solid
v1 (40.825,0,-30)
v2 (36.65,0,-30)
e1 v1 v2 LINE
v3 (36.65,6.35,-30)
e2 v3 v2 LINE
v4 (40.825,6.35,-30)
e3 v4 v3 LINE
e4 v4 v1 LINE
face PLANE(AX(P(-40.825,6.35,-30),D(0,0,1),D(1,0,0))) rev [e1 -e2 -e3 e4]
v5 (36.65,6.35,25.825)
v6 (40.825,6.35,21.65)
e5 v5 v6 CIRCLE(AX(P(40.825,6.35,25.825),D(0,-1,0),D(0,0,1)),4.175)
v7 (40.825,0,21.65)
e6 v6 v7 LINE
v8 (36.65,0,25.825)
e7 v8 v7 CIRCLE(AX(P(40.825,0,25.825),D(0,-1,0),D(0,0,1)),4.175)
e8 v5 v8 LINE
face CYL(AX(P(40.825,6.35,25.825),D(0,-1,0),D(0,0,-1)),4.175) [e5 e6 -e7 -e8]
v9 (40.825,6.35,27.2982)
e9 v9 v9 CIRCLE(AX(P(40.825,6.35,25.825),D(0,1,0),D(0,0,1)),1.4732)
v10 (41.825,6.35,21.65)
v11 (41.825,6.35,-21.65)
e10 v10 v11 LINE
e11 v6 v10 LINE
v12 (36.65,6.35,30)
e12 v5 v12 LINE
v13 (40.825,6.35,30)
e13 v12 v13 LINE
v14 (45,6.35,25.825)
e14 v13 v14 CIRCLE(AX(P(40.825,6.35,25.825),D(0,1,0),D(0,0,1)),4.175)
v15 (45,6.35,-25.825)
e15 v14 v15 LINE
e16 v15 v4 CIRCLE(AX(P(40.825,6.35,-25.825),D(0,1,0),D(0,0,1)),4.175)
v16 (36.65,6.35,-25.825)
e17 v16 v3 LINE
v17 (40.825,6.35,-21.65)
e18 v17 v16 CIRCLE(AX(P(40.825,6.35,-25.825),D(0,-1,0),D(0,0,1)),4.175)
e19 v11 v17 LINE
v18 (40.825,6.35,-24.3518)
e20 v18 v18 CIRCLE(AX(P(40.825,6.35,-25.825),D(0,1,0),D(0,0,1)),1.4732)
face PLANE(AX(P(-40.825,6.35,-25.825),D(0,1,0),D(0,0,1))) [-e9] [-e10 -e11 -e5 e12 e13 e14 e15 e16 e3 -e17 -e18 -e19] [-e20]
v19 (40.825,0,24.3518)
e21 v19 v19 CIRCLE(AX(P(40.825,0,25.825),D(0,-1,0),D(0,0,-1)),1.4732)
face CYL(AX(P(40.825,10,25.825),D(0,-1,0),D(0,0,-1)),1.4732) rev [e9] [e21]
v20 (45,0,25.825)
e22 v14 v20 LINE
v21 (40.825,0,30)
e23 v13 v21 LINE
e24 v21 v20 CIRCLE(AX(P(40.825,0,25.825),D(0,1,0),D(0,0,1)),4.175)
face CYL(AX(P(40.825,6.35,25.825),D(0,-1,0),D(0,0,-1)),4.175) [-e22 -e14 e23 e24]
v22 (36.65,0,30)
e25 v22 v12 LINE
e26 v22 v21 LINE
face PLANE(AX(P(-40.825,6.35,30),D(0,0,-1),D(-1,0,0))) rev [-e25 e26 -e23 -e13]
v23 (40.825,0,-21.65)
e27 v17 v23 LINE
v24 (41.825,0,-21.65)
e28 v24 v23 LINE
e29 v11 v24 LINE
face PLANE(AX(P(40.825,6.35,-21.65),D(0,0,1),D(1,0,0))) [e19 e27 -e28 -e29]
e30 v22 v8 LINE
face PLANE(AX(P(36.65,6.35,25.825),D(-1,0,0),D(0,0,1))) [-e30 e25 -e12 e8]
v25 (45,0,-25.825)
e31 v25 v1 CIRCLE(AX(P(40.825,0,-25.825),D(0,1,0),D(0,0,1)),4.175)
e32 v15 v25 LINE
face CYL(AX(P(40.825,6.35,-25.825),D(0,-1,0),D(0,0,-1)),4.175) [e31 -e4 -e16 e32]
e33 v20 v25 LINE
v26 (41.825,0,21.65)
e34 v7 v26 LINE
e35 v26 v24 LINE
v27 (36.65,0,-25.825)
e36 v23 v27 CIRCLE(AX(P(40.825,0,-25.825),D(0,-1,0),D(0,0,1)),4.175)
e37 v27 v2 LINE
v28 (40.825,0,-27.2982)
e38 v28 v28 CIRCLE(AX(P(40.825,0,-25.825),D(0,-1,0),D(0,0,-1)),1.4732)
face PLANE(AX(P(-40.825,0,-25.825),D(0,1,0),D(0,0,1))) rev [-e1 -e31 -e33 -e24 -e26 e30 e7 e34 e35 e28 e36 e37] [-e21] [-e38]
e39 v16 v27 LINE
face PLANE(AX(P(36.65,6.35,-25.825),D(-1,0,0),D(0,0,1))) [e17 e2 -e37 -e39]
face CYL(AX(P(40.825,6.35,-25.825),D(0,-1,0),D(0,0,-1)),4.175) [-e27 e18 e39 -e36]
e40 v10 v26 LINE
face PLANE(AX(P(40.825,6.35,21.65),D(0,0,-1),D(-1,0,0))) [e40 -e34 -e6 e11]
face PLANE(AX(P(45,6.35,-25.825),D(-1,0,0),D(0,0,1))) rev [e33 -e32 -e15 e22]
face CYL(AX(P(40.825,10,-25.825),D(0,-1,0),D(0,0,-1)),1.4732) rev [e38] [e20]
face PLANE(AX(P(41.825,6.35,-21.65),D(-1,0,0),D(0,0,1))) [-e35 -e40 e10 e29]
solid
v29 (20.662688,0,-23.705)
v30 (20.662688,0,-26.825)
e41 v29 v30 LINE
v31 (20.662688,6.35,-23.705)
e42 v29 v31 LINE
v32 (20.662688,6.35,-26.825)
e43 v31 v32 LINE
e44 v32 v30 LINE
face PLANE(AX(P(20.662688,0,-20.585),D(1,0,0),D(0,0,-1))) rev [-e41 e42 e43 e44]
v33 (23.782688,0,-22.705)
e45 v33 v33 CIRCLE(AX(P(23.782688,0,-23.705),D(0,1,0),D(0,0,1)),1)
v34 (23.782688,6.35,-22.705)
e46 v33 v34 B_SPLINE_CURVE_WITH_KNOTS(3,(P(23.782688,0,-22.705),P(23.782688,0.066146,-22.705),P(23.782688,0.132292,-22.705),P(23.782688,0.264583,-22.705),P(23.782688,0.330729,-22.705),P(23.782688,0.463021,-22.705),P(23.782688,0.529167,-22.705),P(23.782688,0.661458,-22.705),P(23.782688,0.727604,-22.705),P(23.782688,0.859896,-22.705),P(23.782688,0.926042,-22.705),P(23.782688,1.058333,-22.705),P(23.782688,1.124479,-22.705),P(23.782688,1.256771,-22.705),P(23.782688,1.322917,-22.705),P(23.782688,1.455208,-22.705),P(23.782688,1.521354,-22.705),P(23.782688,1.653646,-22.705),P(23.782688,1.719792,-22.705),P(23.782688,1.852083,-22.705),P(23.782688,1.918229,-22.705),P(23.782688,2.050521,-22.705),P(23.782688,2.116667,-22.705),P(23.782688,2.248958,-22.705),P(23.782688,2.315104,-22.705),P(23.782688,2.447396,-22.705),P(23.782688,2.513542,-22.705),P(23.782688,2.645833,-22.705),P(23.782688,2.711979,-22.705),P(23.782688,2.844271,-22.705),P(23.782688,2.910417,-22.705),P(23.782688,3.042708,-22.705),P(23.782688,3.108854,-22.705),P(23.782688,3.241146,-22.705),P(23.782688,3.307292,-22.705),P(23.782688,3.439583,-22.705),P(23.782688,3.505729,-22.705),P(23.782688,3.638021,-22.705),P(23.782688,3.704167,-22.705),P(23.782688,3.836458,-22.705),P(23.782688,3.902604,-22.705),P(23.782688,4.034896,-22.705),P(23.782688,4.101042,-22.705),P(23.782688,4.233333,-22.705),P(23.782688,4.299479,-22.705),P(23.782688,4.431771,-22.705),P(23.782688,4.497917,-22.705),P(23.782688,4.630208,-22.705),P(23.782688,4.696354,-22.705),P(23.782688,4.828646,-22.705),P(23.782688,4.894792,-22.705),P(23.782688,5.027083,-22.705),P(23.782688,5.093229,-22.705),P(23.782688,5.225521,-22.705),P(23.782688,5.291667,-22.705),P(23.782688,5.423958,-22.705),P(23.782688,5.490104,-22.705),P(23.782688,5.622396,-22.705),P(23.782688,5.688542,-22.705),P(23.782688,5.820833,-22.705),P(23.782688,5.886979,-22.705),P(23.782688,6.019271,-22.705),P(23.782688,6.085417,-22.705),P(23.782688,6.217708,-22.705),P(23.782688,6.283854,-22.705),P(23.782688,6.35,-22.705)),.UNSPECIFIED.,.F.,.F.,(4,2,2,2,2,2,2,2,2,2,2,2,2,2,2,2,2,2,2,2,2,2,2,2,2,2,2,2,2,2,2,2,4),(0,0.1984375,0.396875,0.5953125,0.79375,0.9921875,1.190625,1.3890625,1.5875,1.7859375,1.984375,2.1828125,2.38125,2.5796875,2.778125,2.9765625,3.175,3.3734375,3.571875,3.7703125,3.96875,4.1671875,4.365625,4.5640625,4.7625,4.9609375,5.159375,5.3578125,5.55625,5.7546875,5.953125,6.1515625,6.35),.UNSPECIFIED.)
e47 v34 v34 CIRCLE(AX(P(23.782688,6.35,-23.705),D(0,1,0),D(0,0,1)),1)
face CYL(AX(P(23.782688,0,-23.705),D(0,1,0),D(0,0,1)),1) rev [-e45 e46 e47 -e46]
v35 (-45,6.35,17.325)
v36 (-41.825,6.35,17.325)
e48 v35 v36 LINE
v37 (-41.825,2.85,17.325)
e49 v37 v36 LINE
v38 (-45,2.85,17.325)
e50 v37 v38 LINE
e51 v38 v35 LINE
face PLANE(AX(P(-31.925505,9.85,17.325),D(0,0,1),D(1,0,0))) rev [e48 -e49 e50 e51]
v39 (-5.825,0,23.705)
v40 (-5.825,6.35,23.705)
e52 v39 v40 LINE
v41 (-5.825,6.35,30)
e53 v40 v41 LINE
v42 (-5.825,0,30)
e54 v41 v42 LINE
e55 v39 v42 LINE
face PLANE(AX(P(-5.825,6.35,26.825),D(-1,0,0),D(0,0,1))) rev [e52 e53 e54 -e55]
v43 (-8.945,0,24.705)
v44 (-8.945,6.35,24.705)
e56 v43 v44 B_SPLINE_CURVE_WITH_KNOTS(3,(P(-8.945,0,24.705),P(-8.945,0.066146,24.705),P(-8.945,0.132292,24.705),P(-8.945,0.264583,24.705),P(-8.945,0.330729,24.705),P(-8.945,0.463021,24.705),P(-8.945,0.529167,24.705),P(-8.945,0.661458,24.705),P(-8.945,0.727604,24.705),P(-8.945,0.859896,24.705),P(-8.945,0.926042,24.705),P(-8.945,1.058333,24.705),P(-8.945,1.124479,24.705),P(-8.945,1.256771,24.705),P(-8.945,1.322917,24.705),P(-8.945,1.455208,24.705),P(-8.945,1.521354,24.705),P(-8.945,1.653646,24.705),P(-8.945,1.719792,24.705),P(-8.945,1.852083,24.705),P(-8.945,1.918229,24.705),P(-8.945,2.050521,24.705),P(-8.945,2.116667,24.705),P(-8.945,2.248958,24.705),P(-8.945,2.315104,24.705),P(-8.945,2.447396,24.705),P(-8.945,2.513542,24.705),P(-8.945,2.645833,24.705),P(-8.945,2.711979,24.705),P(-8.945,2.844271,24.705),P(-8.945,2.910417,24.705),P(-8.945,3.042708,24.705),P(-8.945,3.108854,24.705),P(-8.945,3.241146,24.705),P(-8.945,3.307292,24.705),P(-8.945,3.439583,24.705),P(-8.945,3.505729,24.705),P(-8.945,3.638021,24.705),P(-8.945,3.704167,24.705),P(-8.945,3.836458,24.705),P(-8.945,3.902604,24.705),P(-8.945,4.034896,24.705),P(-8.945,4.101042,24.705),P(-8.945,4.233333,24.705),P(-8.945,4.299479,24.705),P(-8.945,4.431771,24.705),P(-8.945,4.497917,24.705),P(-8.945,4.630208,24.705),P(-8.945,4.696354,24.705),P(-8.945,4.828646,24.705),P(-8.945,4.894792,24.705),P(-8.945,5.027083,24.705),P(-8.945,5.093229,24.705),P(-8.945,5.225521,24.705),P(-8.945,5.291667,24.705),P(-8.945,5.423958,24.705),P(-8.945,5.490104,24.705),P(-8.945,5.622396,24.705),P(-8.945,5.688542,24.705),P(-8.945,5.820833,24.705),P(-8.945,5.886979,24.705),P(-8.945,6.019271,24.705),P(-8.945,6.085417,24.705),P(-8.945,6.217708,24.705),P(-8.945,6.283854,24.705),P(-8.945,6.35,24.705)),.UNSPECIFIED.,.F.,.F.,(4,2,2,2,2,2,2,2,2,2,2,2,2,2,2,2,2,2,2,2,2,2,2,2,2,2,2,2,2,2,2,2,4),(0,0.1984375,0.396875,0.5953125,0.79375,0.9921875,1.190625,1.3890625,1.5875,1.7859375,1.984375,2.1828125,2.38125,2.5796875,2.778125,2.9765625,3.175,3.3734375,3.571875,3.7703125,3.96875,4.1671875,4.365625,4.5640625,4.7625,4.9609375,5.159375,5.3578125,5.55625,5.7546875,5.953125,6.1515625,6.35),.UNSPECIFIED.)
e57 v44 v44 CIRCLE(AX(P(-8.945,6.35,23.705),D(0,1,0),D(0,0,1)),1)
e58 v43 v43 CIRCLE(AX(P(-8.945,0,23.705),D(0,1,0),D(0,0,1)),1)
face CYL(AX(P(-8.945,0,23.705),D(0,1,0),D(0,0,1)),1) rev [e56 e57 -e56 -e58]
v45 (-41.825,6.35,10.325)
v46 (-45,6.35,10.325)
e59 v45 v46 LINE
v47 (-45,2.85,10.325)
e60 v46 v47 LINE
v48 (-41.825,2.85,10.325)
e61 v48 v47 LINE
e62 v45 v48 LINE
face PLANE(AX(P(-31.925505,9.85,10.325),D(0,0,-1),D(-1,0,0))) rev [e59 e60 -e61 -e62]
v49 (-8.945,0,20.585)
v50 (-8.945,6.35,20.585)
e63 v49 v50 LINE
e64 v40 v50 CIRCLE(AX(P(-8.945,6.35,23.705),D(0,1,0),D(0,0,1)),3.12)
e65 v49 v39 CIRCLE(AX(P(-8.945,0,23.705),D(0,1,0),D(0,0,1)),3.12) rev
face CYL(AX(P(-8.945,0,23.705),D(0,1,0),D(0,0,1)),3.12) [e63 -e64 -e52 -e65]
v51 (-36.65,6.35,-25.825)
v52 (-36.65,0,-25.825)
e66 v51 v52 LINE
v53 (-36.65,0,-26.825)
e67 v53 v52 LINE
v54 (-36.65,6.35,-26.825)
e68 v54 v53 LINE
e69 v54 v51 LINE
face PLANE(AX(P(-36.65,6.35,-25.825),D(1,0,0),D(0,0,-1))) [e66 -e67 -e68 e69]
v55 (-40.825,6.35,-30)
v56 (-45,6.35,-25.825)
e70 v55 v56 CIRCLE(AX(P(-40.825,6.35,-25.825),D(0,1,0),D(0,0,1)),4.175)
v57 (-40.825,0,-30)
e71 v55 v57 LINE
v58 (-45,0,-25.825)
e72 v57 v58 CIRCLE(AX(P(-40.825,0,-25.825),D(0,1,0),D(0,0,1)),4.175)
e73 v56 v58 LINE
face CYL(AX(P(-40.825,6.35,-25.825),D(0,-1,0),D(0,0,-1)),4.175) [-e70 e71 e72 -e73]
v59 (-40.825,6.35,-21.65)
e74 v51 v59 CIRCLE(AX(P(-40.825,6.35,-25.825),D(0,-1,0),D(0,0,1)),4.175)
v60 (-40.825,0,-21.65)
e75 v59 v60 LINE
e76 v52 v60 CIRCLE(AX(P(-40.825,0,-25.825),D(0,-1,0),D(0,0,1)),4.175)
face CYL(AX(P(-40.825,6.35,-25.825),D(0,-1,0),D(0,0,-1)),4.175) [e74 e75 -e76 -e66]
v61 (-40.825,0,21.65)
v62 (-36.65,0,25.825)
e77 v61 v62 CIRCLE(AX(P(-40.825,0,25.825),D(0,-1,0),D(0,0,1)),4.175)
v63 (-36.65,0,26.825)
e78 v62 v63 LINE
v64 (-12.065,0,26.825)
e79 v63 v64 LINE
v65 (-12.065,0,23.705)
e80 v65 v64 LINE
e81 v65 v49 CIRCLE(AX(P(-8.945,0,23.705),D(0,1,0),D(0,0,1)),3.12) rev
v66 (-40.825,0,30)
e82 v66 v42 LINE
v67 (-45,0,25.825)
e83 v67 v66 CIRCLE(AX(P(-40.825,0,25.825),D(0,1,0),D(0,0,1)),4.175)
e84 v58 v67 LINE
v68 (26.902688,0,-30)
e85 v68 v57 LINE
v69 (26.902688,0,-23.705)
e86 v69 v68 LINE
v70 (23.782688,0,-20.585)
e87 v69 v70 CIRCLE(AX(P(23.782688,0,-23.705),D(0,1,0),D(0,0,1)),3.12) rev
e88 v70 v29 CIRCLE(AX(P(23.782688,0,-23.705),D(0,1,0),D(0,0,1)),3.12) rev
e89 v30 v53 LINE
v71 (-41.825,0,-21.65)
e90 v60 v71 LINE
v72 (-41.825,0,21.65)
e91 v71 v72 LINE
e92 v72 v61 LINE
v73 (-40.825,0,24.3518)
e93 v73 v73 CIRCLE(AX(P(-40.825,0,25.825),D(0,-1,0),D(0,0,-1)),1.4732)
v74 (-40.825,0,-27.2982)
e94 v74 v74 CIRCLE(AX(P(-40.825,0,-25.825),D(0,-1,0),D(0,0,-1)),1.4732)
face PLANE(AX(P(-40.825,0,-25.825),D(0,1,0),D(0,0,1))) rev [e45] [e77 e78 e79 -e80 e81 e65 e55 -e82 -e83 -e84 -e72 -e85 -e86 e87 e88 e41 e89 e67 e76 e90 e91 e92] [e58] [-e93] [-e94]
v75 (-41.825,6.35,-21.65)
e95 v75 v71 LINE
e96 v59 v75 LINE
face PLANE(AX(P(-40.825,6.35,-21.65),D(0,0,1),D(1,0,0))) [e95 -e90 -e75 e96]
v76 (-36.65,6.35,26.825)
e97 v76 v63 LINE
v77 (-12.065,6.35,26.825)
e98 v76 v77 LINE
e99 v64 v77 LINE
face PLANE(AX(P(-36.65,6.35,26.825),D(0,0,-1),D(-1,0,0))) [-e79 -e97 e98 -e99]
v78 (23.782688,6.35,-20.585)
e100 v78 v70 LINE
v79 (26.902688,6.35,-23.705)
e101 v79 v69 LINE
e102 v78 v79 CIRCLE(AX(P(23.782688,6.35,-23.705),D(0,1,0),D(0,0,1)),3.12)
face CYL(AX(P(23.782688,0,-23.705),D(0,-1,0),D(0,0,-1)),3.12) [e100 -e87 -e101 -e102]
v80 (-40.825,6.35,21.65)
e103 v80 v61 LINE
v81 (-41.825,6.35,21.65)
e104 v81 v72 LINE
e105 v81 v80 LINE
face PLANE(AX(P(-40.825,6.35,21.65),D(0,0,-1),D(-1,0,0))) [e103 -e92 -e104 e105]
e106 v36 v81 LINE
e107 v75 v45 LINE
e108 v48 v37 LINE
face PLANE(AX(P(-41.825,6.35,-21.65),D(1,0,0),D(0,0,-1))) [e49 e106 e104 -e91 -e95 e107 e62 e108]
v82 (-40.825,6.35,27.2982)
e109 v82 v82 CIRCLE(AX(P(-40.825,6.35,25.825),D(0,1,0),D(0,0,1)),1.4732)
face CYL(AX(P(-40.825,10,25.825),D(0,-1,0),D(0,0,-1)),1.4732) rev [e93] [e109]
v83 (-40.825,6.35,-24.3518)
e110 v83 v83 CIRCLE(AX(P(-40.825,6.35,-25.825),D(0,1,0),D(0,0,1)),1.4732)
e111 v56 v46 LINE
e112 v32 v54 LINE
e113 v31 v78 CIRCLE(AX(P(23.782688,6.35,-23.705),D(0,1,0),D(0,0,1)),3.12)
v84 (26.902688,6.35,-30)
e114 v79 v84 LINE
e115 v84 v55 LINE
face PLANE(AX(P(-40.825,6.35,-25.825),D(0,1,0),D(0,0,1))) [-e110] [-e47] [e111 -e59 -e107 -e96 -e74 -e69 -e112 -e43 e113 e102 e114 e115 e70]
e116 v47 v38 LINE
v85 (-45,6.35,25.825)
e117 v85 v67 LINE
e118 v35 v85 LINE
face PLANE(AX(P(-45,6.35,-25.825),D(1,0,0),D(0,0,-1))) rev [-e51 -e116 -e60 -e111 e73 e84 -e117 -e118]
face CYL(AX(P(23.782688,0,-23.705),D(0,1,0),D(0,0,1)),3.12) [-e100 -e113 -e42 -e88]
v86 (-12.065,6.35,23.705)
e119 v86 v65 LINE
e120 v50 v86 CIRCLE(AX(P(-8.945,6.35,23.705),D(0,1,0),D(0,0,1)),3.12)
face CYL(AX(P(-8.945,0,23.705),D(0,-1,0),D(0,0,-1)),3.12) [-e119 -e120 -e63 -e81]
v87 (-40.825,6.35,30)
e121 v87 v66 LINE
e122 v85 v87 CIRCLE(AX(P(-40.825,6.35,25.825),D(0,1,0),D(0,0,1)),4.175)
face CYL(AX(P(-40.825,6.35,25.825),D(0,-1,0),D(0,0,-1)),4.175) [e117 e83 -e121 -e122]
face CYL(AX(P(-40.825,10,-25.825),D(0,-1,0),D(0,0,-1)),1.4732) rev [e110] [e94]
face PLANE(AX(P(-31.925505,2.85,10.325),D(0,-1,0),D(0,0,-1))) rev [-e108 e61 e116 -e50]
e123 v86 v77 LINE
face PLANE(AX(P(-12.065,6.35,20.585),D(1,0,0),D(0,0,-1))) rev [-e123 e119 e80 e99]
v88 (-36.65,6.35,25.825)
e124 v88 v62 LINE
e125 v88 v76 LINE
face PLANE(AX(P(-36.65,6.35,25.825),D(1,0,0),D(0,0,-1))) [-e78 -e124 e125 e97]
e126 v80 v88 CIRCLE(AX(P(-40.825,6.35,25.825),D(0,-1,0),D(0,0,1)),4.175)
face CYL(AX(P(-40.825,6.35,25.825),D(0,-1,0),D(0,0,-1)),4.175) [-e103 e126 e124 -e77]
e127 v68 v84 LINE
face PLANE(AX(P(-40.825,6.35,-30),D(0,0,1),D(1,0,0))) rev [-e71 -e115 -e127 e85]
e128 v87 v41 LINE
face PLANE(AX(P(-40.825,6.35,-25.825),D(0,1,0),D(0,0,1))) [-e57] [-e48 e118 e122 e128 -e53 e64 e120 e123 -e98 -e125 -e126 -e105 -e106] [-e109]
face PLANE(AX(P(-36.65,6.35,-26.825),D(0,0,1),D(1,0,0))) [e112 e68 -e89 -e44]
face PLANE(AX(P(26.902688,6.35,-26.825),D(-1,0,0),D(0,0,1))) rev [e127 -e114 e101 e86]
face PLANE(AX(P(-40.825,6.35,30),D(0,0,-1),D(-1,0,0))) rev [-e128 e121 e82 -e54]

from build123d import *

# Parameters (mm, degrees)
BOSS_EXTRUDE3_DEPTH = 6.35
SKETCH3_W           = 9.747311717
SKETCH3_H           = 6.35
CUT_EXTRUDE1_DEPTH  = 3.175
SKETCH4_W           = 42.475
SKETCH4_H           = 6.35
CUT_EXTRUDE2_DEPTH  = 8.35
SKETCH5_W           = 7
SKETCH5_H           = 7
CUT_EXTRUDE3_DEPTH  = 3.175
SKETCH7_R           = 1.4732
CUT_EXTRUDE4_DEPTH  = 10
SKETCH10_W          = 6.24
SKETCH10_H          = 6.35
BOSS_EXTRUDE4_DEPTH = 6.24
SKETCH11_W          = 6.24
SKETCH11_H          = 6.35
BOSS_EXTRUDE5_DEPTH = 6.24
SKETCH12_R          = 1
CUT_EXTRUDE5_DEPTH  = 55.454774814
SKETCH13_R          = 1
CUT_EXTRUDE6_DEPTH  = 55.454774814
FILLET1_R           = 3.12


with BuildPart() as part:
    # Sketch2 → Boss-Extrude3 (new body)
    with BuildSketch(Plane(origin=(0, 0, 0), x_dir=(1, 0, 0), z_dir=(0, 1, 0))):
        with BuildLine():
            Line((-45, 25.825), (-45, -25.825))
            ThreePointArc((-45, -25.825), (-43.777170811, -28.777170811), (-40.825, -30))
            Line((-40.825, -30), (40.825, -30))
            ThreePointArc((40.825, -30), (43.777170811, -28.777170811), (45, -25.825))
            Line((45, -25.825), (45, 25.825))
            ThreePointArc((45, 25.825), (43.777170811, 28.777170811), (40.825, 30))
            Line((40.825, 30), (-40.825, 30))
            ThreePointArc((-40.825, 30), (-43.777170811, 28.777170811), (-45, 25.825))
        make_face()
        with BuildLine():
            Line((40.825, 21.65), (41.825, 21.65))
            Line((41.825, 21.65), (41.825, -21.65))
            Line((41.825, -21.65), (40.825, -21.65))
            ThreePointArc((40.825, -21.65), (37.872829189, -22.872829189), (36.65, -25.825))
            Line((36.65, -25.825), (36.65, -26.825))
            Line((36.65, -26.825), (-36.65, -26.825))
            Line((-36.65, -26.825), (-36.65, -25.825))
            ThreePointArc((-36.65, -25.825), (-37.872829189, -22.872829189), (-40.825, -21.65))
            Line((-40.825, -21.65), (-41.825, -21.65))
            Line((-41.825, -21.65), (-41.825, 21.65))
            Line((-41.825, 21.65), (-40.825, 21.65))
            ThreePointArc((-40.825, 21.65), (-37.872829189, 22.872829189), (-36.65, 25.825))
            Line((-36.65, 25.825), (-36.65, 26.825))
            Line((-36.65, 26.825), (36.65, 26.825))
            Line((36.65, 26.825), (36.65, 25.825))
            ThreePointArc((36.65, 25.825), (37.872829189, 22.872829189), (40.825, 21.65))
        make_face(mode=Mode.SUBTRACT)
    extrude(amount=BOSS_EXTRUDE3_DEPTH)

    # Sketch3 → Cut-Extrude1 (cut)
    with BuildSketch(Plane(origin=(0, 0, -30), x_dir=(-1, 0, 0), z_dir=(0, 0, -1))):
        with Locations((-31.776344142, 3.175)):
            Rectangle(SKETCH3_W, SKETCH3_H)
    extrude(amount=-CUT_EXTRUDE1_DEPTH, mode=Mode.SUBTRACT)

    # Sketch4 → Cut-Extrude2 (cut)
    with BuildSketch(Plane.XY.offset(30)):
        with Locations((15.4125, 3.175)):
            Rectangle(SKETCH4_W, SKETCH4_H)
    extrude(amount=-CUT_EXTRUDE2_DEPTH, mode=Mode.SUBTRACT)


with BuildPart() as cut_extrude2_piece_1:
    # of the separate pieces the step leaves, piece 1, a body of its own (cut_extrude2_pieces)
    add(part.part.solids().sort_by_distance((-40.825, 0, 30))[0])

    # Sketch5 → Cut-Extrude3 (cut)
    with BuildSketch(Plane.ZY.offset(45)):
        with Locations((13.825, 6.35)):
            Rectangle(SKETCH5_W, SKETCH5_H)
    extrude(amount=-CUT_EXTRUDE3_DEPTH, mode=Mode.SUBTRACT)


with BuildPart() as cut_extrude2_piece_2:
    # of the separate pieces the step leaves, piece 2, a body of its own (cut_extrude2_pieces)
    add(part.part.solids().sort_by_distance((40.825, 0, -30))[0])


with BuildPart() as cut_extrude4_tool:
    # Sketch7 → Cut-Extrude4 (new body)
    with BuildSketch(Plane.XZ):
        with Locations(Location((-40.825, -25.825, 0), (0, 0, 270))):
            Circle(SKETCH7_R)
        with Locations(Location((-40.825, 25.825, 0), (0, 0, 270))):
            Circle(SKETCH7_R)
        with Locations(Location((40.825, 25.825, 0), (0, 0, 270))):
            Circle(SKETCH7_R)
        with Locations(Location((40.825, -25.825, 0), (0, 0, 270))):
            Circle(SKETCH7_R)
    extrude(amount=-CUT_EXTRUDE4_DEPTH)


with BuildPart() as cut_extrude2_piece_1_1:
    add(cut_extrude2_piece_1.part)

    # Cut-Extrude4: cut by cut_extrude4_tool
    add(cut_extrude4_tool.part, mode=Mode.SUBTRACT)

    # Sketch10 → Boss-Extrude4 (add)
    with BuildSketch(Plane(origin=(0, 0, 26.825), x_dir=(-1, 0, 0), z_dir=(0, 0, -1))):
        with Locations((8.945, 3.175)):
            Rectangle(SKETCH10_W, SKETCH10_H)
    extrude(amount=BOSS_EXTRUDE4_DEPTH)

    # Sketch11 → Boss-Extrude5 (add)
    with BuildSketch(Plane.XY.offset(-26.825)):
        with Locations((23.782688283, 3.175)):
            Rectangle(SKETCH11_W, SKETCH11_H)
    extrude(amount=BOSS_EXTRUDE5_DEPTH)

    # Sketch12 → Cut-Extrude5 (cut, through all)
    with BuildSketch(Plane(origin=(0, 6.35, 0), x_dir=(1, 0, 0), z_dir=(0, 1, 0))):
        with Locations(Location((23.782688283, 23.705, 0), (0, 0, 270))):
            Circle(SKETCH12_R)
    extrude(amount=-CUT_EXTRUDE5_DEPTH, mode=Mode.SUBTRACT)

    # Sketch13 → Cut-Extrude6 (cut, through all)
    with BuildSketch(Plane(origin=(0, 6.35, 0), x_dir=(1, 0, 0), z_dir=(0, 1, 0))):
        with Locations(Location((-8.945, -23.705, 0), (0, 0, 270))):
            Circle(SKETCH13_R)
    extrude(amount=-CUT_EXTRUDE6_DEPTH, mode=Mode.SUBTRACT)

    # Fillet1
    fillet1_edges = [cut_extrude2_piece_1_1.edges().sort_by_distance(p)[0] for p in [
        (26.902688283, 3.175, -20.585),
        (20.662688283, 3.175, -20.585),
        (-5.825, 3.175, 20.585),
        (-12.065, 3.175, 20.585),
    ]]
    fillet(fillet1_edges, radius=FILLET1_R - 0.0001)  # a hair under: the kernel refuses the full size


with BuildPart() as cut_extrude2_piece_2_1:
    add(cut_extrude2_piece_2.part)

    # Cut-Extrude4: cut by cut_extrude4_tool
    add(cut_extrude4_tool.part, mode=Mode.SUBTRACT)


solid = Compound([cut_extrude2_piece_1_1.part, cut_extrude2_piece_2_1.part])
